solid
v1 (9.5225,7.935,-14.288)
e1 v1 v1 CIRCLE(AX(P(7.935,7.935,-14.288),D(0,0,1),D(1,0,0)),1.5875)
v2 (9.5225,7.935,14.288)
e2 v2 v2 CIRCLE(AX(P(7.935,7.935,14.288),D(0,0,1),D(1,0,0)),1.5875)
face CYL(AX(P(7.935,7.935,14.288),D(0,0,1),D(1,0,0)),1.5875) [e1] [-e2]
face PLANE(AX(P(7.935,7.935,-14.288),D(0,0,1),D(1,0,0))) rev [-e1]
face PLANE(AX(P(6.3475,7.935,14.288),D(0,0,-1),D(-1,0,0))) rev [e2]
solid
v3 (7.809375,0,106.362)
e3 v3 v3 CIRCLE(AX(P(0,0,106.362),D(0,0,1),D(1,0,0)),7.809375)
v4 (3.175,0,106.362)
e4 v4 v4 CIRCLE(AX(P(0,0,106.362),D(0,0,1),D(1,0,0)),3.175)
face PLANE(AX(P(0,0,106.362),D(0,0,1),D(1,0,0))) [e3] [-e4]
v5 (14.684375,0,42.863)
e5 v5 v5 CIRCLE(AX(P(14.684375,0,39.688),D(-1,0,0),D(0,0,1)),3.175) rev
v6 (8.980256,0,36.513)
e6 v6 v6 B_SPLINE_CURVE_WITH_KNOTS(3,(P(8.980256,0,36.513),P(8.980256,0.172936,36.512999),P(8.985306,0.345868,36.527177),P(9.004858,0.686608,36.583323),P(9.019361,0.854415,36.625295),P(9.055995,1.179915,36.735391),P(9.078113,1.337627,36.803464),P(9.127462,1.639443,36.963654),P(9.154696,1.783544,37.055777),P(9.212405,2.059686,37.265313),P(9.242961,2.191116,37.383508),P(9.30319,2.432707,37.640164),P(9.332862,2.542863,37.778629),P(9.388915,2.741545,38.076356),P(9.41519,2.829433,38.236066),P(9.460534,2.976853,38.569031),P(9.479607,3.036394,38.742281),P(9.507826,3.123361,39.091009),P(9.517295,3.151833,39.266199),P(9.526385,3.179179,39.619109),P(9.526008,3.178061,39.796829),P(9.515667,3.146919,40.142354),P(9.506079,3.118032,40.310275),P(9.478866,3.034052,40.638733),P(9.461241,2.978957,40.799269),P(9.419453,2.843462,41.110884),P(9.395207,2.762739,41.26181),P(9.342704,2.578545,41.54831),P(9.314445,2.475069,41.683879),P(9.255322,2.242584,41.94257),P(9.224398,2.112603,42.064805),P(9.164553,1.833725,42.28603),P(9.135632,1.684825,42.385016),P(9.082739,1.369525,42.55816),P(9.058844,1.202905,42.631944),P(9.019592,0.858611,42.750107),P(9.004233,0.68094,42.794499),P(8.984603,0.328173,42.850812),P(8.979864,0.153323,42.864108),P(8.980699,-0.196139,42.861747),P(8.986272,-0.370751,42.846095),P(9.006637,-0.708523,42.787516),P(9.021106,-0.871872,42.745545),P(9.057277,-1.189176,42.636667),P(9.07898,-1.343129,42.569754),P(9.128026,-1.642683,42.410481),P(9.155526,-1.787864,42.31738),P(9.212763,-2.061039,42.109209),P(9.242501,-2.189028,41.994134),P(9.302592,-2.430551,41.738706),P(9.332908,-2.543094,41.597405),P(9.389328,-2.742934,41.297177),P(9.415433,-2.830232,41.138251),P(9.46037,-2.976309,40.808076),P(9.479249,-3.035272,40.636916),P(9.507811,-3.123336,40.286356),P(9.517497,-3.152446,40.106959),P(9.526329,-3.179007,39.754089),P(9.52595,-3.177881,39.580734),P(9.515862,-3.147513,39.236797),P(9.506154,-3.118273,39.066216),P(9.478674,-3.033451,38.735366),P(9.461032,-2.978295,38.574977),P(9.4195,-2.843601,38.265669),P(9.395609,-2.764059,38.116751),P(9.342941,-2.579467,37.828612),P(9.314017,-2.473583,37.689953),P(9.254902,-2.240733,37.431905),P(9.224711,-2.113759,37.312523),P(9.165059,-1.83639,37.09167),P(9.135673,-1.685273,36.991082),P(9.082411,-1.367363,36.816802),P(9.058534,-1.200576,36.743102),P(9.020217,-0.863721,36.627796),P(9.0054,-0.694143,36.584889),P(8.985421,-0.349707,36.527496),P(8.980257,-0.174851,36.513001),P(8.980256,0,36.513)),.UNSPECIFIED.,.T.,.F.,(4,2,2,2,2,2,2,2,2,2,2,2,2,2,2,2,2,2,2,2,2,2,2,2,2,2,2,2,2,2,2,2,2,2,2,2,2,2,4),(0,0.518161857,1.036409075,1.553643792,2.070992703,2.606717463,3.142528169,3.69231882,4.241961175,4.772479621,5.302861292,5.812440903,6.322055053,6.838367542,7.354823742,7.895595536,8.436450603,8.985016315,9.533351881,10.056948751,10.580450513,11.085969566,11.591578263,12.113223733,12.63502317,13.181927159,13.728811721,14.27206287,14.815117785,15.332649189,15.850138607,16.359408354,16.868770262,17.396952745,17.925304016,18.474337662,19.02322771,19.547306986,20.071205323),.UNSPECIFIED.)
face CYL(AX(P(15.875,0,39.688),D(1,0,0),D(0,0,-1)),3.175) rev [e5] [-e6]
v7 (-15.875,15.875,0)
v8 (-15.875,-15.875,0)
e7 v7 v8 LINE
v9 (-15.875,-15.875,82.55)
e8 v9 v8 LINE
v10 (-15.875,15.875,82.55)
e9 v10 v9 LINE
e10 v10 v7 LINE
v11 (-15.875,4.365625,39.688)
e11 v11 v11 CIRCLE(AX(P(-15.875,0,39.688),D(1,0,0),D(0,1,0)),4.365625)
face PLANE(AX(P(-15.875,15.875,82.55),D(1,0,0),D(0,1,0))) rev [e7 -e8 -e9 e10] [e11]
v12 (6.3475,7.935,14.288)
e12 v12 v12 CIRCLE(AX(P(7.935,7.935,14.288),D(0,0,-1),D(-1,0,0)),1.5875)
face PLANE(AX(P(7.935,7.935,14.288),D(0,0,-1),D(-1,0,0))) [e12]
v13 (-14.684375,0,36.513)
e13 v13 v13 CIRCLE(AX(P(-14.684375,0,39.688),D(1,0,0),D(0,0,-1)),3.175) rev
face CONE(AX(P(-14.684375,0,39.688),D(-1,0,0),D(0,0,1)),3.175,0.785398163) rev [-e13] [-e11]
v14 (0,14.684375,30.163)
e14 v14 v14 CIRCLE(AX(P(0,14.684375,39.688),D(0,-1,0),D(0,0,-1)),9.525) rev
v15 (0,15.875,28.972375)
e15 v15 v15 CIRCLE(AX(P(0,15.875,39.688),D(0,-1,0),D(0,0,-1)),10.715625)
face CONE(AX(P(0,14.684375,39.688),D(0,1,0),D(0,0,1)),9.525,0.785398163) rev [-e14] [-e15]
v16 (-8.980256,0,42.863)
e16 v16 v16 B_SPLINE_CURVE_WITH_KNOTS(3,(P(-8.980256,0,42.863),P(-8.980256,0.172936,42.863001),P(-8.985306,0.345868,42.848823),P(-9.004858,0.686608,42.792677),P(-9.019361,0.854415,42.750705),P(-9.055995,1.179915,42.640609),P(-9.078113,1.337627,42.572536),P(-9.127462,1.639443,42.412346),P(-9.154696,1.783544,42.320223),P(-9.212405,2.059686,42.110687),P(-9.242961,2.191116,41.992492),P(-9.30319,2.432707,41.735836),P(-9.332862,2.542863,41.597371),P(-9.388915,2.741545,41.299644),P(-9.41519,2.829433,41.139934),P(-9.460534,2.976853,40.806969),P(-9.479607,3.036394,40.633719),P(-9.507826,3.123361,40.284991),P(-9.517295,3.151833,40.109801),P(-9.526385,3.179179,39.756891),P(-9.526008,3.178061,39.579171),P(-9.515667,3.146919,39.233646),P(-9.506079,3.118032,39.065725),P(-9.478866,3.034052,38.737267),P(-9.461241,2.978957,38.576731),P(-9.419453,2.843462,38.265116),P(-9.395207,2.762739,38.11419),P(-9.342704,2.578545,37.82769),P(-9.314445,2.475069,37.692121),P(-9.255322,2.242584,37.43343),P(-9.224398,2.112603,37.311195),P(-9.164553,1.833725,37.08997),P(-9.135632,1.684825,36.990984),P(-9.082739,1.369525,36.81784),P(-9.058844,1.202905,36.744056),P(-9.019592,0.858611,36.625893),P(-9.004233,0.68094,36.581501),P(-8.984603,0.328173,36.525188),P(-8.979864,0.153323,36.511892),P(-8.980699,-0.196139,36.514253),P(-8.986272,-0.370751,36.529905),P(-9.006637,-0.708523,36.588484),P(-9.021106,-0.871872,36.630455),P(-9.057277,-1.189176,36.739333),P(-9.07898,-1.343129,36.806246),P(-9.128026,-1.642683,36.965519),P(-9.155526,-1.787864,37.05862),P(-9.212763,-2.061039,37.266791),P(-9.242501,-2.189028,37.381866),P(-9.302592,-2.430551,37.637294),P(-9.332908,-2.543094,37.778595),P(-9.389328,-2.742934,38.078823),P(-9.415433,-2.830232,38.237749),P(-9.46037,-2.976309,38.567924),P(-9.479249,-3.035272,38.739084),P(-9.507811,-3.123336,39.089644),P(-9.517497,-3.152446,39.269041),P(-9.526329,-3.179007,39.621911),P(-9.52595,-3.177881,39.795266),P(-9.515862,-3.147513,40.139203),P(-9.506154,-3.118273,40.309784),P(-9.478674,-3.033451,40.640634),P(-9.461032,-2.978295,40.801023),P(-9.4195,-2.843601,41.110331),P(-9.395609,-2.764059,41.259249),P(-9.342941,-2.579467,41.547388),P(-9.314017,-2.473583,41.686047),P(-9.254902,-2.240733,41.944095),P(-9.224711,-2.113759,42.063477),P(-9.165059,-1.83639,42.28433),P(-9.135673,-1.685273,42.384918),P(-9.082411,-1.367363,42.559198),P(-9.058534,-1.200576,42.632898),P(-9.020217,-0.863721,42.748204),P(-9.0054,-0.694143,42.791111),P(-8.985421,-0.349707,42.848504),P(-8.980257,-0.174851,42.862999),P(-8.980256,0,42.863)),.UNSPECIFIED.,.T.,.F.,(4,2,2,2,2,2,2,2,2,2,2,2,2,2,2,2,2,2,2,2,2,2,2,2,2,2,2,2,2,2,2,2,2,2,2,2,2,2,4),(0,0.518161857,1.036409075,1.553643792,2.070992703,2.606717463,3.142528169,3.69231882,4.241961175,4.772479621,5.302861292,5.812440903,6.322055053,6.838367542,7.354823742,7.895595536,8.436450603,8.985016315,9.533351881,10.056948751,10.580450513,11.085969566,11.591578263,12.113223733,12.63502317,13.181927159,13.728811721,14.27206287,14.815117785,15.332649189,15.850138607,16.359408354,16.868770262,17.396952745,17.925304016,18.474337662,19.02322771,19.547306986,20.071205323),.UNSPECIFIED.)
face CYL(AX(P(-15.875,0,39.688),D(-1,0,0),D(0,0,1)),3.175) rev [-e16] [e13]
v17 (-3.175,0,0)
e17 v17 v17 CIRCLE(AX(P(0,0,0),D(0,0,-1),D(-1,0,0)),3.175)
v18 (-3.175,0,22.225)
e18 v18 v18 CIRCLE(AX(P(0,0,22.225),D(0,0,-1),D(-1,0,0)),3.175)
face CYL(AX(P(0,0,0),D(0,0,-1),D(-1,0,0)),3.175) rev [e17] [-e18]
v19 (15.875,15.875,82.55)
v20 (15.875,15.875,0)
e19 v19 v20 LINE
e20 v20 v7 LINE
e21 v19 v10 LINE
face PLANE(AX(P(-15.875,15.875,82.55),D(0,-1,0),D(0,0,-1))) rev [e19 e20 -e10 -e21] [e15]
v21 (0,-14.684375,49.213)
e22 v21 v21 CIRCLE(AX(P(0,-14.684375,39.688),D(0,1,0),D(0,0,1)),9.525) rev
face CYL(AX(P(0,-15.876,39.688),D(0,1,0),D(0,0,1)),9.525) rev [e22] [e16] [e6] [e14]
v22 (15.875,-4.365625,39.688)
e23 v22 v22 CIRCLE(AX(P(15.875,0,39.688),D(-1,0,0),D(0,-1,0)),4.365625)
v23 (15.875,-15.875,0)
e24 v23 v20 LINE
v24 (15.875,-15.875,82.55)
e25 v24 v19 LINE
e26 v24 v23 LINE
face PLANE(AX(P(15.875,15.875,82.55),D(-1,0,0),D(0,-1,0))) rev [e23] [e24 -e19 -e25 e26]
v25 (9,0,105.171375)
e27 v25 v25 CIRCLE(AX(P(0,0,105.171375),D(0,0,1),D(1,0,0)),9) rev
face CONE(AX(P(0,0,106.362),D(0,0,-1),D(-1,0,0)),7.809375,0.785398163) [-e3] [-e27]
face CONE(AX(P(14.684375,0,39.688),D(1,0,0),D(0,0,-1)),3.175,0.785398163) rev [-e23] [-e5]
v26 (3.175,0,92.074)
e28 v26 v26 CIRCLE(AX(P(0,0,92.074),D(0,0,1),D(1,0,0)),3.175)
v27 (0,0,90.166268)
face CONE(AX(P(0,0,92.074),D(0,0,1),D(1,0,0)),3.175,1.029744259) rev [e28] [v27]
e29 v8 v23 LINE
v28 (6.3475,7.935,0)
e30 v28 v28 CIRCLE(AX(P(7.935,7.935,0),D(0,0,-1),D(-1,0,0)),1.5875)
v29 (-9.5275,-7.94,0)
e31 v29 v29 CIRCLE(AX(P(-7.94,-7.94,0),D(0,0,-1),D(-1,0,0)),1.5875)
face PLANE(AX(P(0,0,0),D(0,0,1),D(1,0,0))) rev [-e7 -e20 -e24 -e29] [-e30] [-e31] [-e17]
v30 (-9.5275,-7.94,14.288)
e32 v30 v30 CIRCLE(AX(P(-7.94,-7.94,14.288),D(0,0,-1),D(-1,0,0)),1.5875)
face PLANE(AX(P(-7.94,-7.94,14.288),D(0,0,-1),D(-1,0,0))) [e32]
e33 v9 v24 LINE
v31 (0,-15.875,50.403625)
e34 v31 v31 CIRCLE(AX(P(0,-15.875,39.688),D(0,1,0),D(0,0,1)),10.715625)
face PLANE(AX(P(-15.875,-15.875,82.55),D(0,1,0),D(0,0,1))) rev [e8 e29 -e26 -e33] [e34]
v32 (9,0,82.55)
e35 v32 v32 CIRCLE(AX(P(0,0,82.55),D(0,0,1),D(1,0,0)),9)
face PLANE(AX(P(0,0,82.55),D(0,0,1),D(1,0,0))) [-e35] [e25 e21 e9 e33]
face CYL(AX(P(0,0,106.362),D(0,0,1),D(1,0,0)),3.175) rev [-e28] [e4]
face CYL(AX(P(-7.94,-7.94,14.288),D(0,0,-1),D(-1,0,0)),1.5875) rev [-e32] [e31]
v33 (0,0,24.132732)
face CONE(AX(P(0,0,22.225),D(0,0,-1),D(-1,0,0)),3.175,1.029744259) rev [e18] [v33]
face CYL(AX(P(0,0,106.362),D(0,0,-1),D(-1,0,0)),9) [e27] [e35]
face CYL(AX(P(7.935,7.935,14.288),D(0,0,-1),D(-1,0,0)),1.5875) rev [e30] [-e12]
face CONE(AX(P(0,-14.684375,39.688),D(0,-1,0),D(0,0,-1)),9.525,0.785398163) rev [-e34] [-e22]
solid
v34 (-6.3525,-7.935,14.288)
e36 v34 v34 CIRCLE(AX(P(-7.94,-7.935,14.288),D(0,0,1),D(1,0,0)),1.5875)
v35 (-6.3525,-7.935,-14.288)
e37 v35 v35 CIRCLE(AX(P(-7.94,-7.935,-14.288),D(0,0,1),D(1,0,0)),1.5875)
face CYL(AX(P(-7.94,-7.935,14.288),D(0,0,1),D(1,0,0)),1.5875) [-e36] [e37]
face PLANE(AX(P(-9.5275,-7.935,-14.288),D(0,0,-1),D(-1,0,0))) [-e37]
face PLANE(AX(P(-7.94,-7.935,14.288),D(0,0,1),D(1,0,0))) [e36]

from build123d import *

# Parameters (mm, degrees)
CROQUIS1_W                               = 31.75
CROQUIS1_H                               = 31.75
SALIENTE_EXTRUIR1_DEPTH                  = 82.55
CORTAR_EXTRUIR2_REACH                    = 91.859
CROQUIS2_R                               = 9.525
CROQUIS3_R                               = 9
SALIENTE_EXTRUIR2_DEPTH                  = 23.812
CROQUIS4_R                               = 1.5875
CORTAR_EXTRUIR3_DEPTH                    = 14.288
CROQUIS7_W                               = 1.5875
CROQUIS7_H                               = 28.576
DI_METRO_START                           = -15.875
DI_METRO_DE_TALADRO_1_4_0_25_1_OUTLINE_R = 3.175
DI_METRO_DE_TALADRO_1_4_0_25_1_DEPTH     = 31.75
CHAFL_N2_SIZE                            = 1.190625
CHAFL_N3_SIZE                            = 1.190625
CHAFL_N4_SIZE                            = 1.190625
CHAFL_N5_SIZE                            = 1.190625


# Read off the part's stored shape, not the designer's step: Diámetro de taladro 1/4 (0.25)1
with BuildPart() as part:
    # Croquis1 → Saliente-Extruir1 (new body)
    with BuildSketch(Plane.XY):
        Rectangle(CROQUIS1_W, CROQUIS1_H)
    extrude(amount=SALIENTE_EXTRUIR1_DEPTH)

    # Croquis2 → Cortar-Extruir2 (cut, up to next)
    with BuildSketch(Plane(origin=(0, 15.875, 0), x_dir=(1, 0, 0), z_dir=(0, 1, 0)), mode=Mode.PRIVATE) as cortar_extruir2_sk1:
        with Locations(Location((0, -39.688, 0), (0, 0, 270))):
            Circle(CROQUIS2_R)
    cortar_extruir2_tool1 = extrude(cortar_extruir2_sk1.sketch, amount=-CORTAR_EXTRUIR2_REACH, mode=Mode.PRIVATE) & part.part
    add(cortar_extruir2_tool1.solids().sort_by_distance((0, 15.875, 39.688))[0], mode=Mode.SUBTRACT)

    # Croquis3 → Saliente-Extruir2 (add)
    with BuildSketch(Plane.XY.offset(82.55)):
        Circle(CROQUIS3_R)
    extrude(amount=SALIENTE_EXTRUIR2_DEPTH)

    # Croquis4 → Cortar-Extruir3 (cut)
    with BuildSketch(Plane(origin=(0, 0, 0), x_dir=(-1, 0, 0), z_dir=(0, 0, -1))):
        with Locations((-7.935, 7.935)):
            Circle(CROQUIS4_R)
        with Locations((7.94, -7.94)):
            Circle(CROQUIS4_R)
    extrude(amount=-CORTAR_EXTRUIR3_DEPTH, mode=Mode.SUBTRACT)

    # Croquis8 → Taladro roscado 1/4-201 (revolve, cut)
    with BuildSketch(Plane(origin=(0, 0, 106.362), x_dir=(0, -1, 0), z_dir=(1, 0, 0))):
        Polygon((0, 0), (0, 16.195732465), (3.175, 14.288), (3.175, 0), align=None)
    revolve(axis=Axis((0, 0, 112.712), (0, 0, -1)), mode=Mode.SUBTRACT)

    # Diámetro de taladro 1/4 (0.25)1 outline → Diámetro de taladro 1/4 (0.25)1 (cut)
    with BuildSketch(Plane.YZ.offset(DI_METRO_START)):
        with Locations((0, 39.688)):
            Circle(DI_METRO_DE_TALADRO_1_4_0_25_1_OUTLINE_R)
    extrude(amount=DI_METRO_DE_TALADRO_1_4_0_25_1_DEPTH, mode=Mode.SUBTRACT)

    # Chaflán2
    chafl_n2_edges = [part.edges().sort_by_distance(p)[0] for p in [
        (0, 15.875, 30.163),
    ]]
    chamfer(chafl_n2_edges, length=CHAFL_N2_SIZE)

    # Chaflán3
    chafl_n3_edges = [part.edges().sort_by_distance(p)[0] for p in [
        (0, -15.875, 30.163),
    ]]
    chamfer(chafl_n3_edges, length=CHAFL_N3_SIZE)

    # Chaflán4
    chafl_n4_edges = [part.edges().sort_by_distance(p)[0] for p in [
        (-9, 0, 106.362),
    ]]
    chamfer(chafl_n4_edges, length=CHAFL_N4_SIZE)

    # Chaflán5
    chafl_n5_edges = [part.edges().sort_by_distance(p)[0] for p in [
        (-15.875, -3.175, 39.688),
        (15.875, -3.175, 39.688),
    ]]
    chamfer(chafl_n5_edges, length=CHAFL_N5_SIZE)

    # Croquis11 → Taladro roscado 1/4-202 (revolve, cut)
    with BuildSketch(Plane.YZ):
        Polygon((0, 0), (0, 24.132732465), (3.175, 22.225), (3.175, 0), align=None)
    revolve(axis=Axis((0, 0, -6.35), (0, 0, 1)), mode=Mode.SUBTRACT)


with BuildPart() as body_2:
    # Croquis6 → Revolución1 (revolve)
    with BuildSketch(Plane(origin=(0, 7.935, 0), x_dir=(1, 0, 0), z_dir=(0, 1, 0)), mode=Mode.PRIVATE) as revoluci_n1_sk:
        Polygon((6.3475, 0), (6.3475, -14.288), (7.935, -14.288), (7.935, 14.288), (6.3475, 14.288), align=None)
    revolve(revoluci_n1_sk.sketch.rotate(Axis((7.935, 7.935, 14.288), (0, 0, -1)), 180), axis=Axis((7.935, 7.935, 14.288), (0, 0, -1)))


with BuildPart() as body_3:
    # Croquis7 → Revolución2 (revolve)
    with BuildSketch(Plane(origin=(0, -7.935, 0), x_dir=(-1, 0, 0), z_dir=(0, -1, 0)), mode=Mode.PRIVATE) as revoluci_n2_sk:
        with Locations((8.73375, 0)):
            Rectangle(CROQUIS7_W, CROQUIS7_H)
    revolve(revoluci_n2_sk.sketch.rotate(Axis((-7.94, -7.935, 14.288), (0, 0, -1)), 180), axis=Axis((-7.94, -7.935, 14.288), (0, 0, -1)))


solid = Compound([part.part, body_2.part, body_3.part])
